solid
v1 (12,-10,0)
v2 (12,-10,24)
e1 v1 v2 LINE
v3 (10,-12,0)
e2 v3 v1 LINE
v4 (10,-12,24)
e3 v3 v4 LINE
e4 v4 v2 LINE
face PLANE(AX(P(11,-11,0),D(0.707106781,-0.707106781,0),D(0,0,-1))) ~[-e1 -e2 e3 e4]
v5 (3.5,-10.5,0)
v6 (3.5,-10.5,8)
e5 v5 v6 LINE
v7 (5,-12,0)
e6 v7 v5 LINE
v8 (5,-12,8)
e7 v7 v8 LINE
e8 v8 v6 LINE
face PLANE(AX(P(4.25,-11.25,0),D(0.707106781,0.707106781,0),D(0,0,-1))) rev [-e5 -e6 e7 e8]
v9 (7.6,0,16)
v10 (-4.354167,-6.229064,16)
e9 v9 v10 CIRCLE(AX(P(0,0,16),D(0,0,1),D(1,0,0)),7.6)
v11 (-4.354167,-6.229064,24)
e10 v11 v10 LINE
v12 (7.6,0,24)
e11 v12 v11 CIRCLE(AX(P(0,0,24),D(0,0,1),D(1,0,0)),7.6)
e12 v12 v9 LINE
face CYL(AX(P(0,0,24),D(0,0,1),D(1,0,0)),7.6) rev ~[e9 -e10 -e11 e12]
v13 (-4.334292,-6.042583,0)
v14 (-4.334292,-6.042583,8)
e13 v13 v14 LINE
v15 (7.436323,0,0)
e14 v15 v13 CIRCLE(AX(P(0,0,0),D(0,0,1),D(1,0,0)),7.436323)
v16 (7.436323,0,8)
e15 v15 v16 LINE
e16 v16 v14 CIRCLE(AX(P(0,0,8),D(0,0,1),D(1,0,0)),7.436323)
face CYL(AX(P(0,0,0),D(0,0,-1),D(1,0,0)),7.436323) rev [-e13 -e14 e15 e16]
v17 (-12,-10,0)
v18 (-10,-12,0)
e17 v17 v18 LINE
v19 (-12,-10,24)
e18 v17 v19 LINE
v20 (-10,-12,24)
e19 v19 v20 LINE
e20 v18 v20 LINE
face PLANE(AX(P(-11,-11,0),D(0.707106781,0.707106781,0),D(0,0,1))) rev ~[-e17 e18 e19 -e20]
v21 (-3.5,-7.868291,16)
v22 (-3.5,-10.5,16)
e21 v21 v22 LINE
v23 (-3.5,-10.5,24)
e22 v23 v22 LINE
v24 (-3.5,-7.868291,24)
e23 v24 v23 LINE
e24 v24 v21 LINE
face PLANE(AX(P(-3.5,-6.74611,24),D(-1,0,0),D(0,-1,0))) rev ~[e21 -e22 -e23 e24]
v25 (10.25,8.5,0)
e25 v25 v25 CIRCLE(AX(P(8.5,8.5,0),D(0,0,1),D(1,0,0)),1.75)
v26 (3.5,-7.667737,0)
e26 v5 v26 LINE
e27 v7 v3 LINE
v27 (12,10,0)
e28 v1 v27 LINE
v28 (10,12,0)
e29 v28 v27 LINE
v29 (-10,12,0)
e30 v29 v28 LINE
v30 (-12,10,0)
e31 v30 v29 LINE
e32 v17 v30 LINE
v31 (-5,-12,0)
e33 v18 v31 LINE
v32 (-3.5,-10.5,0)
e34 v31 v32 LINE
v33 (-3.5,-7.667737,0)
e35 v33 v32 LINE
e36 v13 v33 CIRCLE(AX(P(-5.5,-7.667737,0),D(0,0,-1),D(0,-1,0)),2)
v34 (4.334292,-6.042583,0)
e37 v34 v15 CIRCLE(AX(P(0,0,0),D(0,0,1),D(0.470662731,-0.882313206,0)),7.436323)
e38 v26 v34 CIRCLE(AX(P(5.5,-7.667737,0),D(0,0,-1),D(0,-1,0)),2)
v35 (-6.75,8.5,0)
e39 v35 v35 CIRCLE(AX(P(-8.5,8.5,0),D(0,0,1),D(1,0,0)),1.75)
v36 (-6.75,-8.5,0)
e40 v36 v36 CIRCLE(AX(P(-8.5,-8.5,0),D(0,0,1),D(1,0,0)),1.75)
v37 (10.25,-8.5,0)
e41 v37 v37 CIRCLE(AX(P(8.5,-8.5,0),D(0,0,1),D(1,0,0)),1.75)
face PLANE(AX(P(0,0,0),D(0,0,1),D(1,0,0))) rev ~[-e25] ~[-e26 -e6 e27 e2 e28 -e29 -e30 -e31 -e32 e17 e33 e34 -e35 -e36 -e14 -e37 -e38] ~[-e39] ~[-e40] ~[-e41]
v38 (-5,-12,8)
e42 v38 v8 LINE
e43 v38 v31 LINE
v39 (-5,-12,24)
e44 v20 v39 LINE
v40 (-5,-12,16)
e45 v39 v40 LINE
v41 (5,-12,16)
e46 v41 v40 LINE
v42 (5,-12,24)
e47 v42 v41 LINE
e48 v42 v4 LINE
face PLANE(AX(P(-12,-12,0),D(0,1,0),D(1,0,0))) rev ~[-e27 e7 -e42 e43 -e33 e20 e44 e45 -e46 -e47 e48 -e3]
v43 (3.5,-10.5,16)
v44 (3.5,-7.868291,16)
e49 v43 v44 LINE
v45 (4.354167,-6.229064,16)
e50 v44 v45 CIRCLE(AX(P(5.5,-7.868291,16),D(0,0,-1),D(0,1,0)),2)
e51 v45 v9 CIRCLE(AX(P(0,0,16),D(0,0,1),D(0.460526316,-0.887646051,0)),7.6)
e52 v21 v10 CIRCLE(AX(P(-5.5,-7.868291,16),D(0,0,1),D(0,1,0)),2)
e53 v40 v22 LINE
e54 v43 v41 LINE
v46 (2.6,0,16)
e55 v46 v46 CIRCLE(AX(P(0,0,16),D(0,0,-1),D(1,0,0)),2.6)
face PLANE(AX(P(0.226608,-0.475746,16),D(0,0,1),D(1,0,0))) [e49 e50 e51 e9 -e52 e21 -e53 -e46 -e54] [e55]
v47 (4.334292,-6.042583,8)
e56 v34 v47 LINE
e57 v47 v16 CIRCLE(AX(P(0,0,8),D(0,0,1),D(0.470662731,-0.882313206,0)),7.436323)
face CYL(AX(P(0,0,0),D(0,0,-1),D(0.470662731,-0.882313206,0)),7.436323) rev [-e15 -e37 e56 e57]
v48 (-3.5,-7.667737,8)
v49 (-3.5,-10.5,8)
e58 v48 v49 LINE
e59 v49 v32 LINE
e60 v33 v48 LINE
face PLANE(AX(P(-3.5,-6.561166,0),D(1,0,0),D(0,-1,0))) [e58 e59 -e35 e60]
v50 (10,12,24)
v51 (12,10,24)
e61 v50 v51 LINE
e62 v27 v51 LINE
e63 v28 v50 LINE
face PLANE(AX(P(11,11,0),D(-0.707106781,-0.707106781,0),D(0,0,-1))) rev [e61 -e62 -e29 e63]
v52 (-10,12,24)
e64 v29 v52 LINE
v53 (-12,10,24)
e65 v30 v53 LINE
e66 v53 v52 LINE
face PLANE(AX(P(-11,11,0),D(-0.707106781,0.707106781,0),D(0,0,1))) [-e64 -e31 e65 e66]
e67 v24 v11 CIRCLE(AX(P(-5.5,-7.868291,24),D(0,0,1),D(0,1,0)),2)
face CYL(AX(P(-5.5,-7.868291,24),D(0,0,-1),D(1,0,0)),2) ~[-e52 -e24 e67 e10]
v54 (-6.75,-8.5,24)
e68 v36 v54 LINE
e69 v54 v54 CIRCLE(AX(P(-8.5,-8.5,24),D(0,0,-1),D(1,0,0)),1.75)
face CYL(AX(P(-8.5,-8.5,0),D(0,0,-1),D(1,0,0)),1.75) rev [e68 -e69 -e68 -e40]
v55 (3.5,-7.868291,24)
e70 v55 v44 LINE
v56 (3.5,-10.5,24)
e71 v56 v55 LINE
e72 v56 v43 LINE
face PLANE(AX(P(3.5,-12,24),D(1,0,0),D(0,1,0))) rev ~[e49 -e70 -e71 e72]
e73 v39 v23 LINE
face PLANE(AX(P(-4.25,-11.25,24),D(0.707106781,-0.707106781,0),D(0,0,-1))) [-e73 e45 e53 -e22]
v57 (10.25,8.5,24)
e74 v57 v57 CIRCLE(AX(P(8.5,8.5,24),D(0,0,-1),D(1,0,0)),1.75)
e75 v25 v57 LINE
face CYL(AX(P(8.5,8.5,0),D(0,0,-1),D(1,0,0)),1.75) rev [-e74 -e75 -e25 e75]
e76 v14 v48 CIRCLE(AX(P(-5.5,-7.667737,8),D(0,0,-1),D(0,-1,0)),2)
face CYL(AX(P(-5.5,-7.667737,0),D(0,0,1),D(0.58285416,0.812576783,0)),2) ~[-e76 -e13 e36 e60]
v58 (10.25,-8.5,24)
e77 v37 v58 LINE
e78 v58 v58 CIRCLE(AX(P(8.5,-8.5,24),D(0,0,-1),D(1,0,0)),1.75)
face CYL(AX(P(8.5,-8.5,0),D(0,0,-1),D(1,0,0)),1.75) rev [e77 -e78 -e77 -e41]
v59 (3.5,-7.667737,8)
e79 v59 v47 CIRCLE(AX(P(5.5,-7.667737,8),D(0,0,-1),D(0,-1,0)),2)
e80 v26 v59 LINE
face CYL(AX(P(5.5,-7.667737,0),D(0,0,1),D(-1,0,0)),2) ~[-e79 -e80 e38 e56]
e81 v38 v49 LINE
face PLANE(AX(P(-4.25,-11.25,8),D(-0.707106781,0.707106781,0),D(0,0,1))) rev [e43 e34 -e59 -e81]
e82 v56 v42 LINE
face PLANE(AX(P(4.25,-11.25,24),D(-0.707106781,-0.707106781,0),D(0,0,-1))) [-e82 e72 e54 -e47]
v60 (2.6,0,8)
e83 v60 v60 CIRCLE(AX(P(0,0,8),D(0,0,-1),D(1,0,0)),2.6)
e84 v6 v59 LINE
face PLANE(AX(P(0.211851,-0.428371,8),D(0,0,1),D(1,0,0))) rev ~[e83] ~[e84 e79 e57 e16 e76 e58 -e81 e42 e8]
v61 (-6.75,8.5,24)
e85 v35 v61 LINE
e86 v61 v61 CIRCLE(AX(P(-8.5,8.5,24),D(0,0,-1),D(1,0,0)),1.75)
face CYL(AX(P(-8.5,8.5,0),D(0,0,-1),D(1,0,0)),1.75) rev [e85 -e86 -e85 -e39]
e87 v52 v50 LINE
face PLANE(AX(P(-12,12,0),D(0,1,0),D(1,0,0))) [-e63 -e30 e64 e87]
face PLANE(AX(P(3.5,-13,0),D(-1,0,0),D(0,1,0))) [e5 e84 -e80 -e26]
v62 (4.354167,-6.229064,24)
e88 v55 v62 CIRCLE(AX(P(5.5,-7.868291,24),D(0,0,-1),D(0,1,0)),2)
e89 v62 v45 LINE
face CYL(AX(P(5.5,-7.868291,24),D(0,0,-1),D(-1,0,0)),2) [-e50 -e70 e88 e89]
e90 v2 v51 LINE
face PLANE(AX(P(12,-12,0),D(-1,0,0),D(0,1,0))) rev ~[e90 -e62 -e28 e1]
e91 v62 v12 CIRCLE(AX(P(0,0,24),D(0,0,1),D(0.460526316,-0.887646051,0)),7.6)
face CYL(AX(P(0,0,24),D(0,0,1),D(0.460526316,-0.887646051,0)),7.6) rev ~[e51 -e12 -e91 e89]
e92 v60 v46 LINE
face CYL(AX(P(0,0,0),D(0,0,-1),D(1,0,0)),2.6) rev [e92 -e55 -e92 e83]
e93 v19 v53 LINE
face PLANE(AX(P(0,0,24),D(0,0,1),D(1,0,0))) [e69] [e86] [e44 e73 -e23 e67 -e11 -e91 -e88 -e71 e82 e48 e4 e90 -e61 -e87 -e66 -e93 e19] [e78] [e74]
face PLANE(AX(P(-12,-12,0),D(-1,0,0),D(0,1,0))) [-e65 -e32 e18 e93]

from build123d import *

# Parameters (mm, degrees)
F0_W      = 24
F0_H      = 24
F0_R      = 2.6
F1_DEPTH  = 24
F2_SIZE   = 2
F4_DEPTH  = 8
F5_R      = 2
F7_DEPTH  = 8
F8_R      = 2
F9_SIZE   = 1.5
F10_R     = 1.75
F11_DEPTH = 25


with BuildPart() as f1:
    # F0 (on Top) → F1 (new body)
    with BuildSketch(Plane.XY):
        Rectangle(F0_W, F0_H)
        Circle(F0_R, mode=Mode.SUBTRACT)
    extrude(amount=F1_DEPTH)

    # F2
    f2_edges = [f1.edges().sort_by_distance(p)[0] for p in [
        (-12, -12, 12),
        (12, -12, 12),
        (-12, 12, 12),
        (12, 12, 12),
    ]]
    chamfer(f2_edges, length=F2_SIZE)

    # F3 (on Top) → F4 (cut)
    with BuildSketch(Plane.XY):
        with BuildLine():
            ThreePointArc((3.5, -6.5611658181), (6.3767557079, -3.8256873283), (7.4363228072, 0))
            ThreePointArc((7.4363228072, 0), (-3.8256873283, 6.3767557079), (-3.5, -6.5611658181))
            Line((-3.5, -6.5611658181), (-3.5, -3))
            Line((-3.5, -3), (3.5, -3))
            Line((3.5, -3), (3.5, -6.5611658181))
        make_face()
        with BuildLine():
            Line((-3.5, -3), (-3.5, -6.5611658181))
            ThreePointArc((-3.5, -6.5611658181), (0, -7.4363228072), (3.5, -6.5611658181))
            Line((3.5, -6.5611658181), (3.5, -3))
            Line((3.5, -3), (-3.5, -3))
        make_face()
        with BuildLine():
            ThreePointArc((3.5, -6.5611658181), (0, -7.4363228072), (-3.5, -6.5611658181))
            Line((-3.5, -6.5611658181), (-3.5, -13))
            Line((-3.5, -13), (3.5, -13))
            Line((3.5, -13), (3.5, -6.5611658181))
        make_face()
    extrude(amount=F4_DEPTH, mode=Mode.SUBTRACT)

    # F5
    f5_edges = [f1.edges().sort_by_distance(p)[0] for p in [
        (-3.5, -6.561166, 4),
        (3.5, -6.561166, 4),
    ]]
    fillet(f5_edges, radius=F5_R)

    # F6 (on face) → F7 (cut)
    with BuildSketch(Plane.XY.offset(24)):
        with BuildLine():
            ThreePointArc((3.5, -6.7461099902), (6.4946131525, -3.9471508712), (7.6, 0))
            ThreePointArc((7.6, 0), (-3.9471508712, 6.4946131525), (-3.5, -6.7461099902))
            Line((-3.5, -6.7461099902), (-3.5, -4.0145893581))
            Line((-3.5, -4.0145893581), (3.5, -4.0145893581))
            Line((3.5, -4.0145893581), (3.5, -6.7461099902))
        make_face()
        with BuildLine():
            Line((-3.5, -4.0145893581), (-3.5, -6.7461099902))
            ThreePointArc((-3.5, -6.7461099902), (0, -7.6), (3.5, -6.7461099902))
            Line((3.5, -6.7461099902), (3.5, -4.0145893581))
            Line((3.5, -4.0145893581), (-3.5, -4.0145893581))
        make_face()
        with BuildLine():
            ThreePointArc((3.5, -6.7461099902), (0, -7.6), (-3.5, -6.7461099902))
            Line((-3.5, -6.7461099902), (-3.5, -12))
            Line((-3.5, -12), (3.5, -12))
            Line((3.5, -12), (3.5, -6.7461099902))
        make_face()
    extrude(amount=-F7_DEPTH, mode=Mode.SUBTRACT)

    # F8
    f8_edges = [f1.edges().sort_by_distance(p)[0] for p in [
        (3.5, -6.74611, 20),
        (-3.5, -6.74611, 20),
    ]]
    fillet(f8_edges, radius=F8_R)

    # F9
    f9_edges = [f1.edges().sort_by_distance(p)[0] for p in [
        (3.5, -12, 20),
        (-3.5, -12, 20),
        (3.5, -12, 4),
        (-3.5, -12, 4),
    ]]
    chamfer(f9_edges, length=F9_SIZE)

    # F10 (on Top) → F11 (cut)
    with BuildSketch(Plane.XY):
        with Locations((-8.5, -8.5)):
            Circle(F10_R)
        with Locations((8.5, -8.5)):
            Circle(F10_R)
        with Locations((8.5, 8.5)):
            Circle(F10_R)
        with Locations((-8.5, 8.5)):
            Circle(F10_R)
    extrude(amount=F11_DEPTH, mode=Mode.SUBTRACT)


solid = f1.part
